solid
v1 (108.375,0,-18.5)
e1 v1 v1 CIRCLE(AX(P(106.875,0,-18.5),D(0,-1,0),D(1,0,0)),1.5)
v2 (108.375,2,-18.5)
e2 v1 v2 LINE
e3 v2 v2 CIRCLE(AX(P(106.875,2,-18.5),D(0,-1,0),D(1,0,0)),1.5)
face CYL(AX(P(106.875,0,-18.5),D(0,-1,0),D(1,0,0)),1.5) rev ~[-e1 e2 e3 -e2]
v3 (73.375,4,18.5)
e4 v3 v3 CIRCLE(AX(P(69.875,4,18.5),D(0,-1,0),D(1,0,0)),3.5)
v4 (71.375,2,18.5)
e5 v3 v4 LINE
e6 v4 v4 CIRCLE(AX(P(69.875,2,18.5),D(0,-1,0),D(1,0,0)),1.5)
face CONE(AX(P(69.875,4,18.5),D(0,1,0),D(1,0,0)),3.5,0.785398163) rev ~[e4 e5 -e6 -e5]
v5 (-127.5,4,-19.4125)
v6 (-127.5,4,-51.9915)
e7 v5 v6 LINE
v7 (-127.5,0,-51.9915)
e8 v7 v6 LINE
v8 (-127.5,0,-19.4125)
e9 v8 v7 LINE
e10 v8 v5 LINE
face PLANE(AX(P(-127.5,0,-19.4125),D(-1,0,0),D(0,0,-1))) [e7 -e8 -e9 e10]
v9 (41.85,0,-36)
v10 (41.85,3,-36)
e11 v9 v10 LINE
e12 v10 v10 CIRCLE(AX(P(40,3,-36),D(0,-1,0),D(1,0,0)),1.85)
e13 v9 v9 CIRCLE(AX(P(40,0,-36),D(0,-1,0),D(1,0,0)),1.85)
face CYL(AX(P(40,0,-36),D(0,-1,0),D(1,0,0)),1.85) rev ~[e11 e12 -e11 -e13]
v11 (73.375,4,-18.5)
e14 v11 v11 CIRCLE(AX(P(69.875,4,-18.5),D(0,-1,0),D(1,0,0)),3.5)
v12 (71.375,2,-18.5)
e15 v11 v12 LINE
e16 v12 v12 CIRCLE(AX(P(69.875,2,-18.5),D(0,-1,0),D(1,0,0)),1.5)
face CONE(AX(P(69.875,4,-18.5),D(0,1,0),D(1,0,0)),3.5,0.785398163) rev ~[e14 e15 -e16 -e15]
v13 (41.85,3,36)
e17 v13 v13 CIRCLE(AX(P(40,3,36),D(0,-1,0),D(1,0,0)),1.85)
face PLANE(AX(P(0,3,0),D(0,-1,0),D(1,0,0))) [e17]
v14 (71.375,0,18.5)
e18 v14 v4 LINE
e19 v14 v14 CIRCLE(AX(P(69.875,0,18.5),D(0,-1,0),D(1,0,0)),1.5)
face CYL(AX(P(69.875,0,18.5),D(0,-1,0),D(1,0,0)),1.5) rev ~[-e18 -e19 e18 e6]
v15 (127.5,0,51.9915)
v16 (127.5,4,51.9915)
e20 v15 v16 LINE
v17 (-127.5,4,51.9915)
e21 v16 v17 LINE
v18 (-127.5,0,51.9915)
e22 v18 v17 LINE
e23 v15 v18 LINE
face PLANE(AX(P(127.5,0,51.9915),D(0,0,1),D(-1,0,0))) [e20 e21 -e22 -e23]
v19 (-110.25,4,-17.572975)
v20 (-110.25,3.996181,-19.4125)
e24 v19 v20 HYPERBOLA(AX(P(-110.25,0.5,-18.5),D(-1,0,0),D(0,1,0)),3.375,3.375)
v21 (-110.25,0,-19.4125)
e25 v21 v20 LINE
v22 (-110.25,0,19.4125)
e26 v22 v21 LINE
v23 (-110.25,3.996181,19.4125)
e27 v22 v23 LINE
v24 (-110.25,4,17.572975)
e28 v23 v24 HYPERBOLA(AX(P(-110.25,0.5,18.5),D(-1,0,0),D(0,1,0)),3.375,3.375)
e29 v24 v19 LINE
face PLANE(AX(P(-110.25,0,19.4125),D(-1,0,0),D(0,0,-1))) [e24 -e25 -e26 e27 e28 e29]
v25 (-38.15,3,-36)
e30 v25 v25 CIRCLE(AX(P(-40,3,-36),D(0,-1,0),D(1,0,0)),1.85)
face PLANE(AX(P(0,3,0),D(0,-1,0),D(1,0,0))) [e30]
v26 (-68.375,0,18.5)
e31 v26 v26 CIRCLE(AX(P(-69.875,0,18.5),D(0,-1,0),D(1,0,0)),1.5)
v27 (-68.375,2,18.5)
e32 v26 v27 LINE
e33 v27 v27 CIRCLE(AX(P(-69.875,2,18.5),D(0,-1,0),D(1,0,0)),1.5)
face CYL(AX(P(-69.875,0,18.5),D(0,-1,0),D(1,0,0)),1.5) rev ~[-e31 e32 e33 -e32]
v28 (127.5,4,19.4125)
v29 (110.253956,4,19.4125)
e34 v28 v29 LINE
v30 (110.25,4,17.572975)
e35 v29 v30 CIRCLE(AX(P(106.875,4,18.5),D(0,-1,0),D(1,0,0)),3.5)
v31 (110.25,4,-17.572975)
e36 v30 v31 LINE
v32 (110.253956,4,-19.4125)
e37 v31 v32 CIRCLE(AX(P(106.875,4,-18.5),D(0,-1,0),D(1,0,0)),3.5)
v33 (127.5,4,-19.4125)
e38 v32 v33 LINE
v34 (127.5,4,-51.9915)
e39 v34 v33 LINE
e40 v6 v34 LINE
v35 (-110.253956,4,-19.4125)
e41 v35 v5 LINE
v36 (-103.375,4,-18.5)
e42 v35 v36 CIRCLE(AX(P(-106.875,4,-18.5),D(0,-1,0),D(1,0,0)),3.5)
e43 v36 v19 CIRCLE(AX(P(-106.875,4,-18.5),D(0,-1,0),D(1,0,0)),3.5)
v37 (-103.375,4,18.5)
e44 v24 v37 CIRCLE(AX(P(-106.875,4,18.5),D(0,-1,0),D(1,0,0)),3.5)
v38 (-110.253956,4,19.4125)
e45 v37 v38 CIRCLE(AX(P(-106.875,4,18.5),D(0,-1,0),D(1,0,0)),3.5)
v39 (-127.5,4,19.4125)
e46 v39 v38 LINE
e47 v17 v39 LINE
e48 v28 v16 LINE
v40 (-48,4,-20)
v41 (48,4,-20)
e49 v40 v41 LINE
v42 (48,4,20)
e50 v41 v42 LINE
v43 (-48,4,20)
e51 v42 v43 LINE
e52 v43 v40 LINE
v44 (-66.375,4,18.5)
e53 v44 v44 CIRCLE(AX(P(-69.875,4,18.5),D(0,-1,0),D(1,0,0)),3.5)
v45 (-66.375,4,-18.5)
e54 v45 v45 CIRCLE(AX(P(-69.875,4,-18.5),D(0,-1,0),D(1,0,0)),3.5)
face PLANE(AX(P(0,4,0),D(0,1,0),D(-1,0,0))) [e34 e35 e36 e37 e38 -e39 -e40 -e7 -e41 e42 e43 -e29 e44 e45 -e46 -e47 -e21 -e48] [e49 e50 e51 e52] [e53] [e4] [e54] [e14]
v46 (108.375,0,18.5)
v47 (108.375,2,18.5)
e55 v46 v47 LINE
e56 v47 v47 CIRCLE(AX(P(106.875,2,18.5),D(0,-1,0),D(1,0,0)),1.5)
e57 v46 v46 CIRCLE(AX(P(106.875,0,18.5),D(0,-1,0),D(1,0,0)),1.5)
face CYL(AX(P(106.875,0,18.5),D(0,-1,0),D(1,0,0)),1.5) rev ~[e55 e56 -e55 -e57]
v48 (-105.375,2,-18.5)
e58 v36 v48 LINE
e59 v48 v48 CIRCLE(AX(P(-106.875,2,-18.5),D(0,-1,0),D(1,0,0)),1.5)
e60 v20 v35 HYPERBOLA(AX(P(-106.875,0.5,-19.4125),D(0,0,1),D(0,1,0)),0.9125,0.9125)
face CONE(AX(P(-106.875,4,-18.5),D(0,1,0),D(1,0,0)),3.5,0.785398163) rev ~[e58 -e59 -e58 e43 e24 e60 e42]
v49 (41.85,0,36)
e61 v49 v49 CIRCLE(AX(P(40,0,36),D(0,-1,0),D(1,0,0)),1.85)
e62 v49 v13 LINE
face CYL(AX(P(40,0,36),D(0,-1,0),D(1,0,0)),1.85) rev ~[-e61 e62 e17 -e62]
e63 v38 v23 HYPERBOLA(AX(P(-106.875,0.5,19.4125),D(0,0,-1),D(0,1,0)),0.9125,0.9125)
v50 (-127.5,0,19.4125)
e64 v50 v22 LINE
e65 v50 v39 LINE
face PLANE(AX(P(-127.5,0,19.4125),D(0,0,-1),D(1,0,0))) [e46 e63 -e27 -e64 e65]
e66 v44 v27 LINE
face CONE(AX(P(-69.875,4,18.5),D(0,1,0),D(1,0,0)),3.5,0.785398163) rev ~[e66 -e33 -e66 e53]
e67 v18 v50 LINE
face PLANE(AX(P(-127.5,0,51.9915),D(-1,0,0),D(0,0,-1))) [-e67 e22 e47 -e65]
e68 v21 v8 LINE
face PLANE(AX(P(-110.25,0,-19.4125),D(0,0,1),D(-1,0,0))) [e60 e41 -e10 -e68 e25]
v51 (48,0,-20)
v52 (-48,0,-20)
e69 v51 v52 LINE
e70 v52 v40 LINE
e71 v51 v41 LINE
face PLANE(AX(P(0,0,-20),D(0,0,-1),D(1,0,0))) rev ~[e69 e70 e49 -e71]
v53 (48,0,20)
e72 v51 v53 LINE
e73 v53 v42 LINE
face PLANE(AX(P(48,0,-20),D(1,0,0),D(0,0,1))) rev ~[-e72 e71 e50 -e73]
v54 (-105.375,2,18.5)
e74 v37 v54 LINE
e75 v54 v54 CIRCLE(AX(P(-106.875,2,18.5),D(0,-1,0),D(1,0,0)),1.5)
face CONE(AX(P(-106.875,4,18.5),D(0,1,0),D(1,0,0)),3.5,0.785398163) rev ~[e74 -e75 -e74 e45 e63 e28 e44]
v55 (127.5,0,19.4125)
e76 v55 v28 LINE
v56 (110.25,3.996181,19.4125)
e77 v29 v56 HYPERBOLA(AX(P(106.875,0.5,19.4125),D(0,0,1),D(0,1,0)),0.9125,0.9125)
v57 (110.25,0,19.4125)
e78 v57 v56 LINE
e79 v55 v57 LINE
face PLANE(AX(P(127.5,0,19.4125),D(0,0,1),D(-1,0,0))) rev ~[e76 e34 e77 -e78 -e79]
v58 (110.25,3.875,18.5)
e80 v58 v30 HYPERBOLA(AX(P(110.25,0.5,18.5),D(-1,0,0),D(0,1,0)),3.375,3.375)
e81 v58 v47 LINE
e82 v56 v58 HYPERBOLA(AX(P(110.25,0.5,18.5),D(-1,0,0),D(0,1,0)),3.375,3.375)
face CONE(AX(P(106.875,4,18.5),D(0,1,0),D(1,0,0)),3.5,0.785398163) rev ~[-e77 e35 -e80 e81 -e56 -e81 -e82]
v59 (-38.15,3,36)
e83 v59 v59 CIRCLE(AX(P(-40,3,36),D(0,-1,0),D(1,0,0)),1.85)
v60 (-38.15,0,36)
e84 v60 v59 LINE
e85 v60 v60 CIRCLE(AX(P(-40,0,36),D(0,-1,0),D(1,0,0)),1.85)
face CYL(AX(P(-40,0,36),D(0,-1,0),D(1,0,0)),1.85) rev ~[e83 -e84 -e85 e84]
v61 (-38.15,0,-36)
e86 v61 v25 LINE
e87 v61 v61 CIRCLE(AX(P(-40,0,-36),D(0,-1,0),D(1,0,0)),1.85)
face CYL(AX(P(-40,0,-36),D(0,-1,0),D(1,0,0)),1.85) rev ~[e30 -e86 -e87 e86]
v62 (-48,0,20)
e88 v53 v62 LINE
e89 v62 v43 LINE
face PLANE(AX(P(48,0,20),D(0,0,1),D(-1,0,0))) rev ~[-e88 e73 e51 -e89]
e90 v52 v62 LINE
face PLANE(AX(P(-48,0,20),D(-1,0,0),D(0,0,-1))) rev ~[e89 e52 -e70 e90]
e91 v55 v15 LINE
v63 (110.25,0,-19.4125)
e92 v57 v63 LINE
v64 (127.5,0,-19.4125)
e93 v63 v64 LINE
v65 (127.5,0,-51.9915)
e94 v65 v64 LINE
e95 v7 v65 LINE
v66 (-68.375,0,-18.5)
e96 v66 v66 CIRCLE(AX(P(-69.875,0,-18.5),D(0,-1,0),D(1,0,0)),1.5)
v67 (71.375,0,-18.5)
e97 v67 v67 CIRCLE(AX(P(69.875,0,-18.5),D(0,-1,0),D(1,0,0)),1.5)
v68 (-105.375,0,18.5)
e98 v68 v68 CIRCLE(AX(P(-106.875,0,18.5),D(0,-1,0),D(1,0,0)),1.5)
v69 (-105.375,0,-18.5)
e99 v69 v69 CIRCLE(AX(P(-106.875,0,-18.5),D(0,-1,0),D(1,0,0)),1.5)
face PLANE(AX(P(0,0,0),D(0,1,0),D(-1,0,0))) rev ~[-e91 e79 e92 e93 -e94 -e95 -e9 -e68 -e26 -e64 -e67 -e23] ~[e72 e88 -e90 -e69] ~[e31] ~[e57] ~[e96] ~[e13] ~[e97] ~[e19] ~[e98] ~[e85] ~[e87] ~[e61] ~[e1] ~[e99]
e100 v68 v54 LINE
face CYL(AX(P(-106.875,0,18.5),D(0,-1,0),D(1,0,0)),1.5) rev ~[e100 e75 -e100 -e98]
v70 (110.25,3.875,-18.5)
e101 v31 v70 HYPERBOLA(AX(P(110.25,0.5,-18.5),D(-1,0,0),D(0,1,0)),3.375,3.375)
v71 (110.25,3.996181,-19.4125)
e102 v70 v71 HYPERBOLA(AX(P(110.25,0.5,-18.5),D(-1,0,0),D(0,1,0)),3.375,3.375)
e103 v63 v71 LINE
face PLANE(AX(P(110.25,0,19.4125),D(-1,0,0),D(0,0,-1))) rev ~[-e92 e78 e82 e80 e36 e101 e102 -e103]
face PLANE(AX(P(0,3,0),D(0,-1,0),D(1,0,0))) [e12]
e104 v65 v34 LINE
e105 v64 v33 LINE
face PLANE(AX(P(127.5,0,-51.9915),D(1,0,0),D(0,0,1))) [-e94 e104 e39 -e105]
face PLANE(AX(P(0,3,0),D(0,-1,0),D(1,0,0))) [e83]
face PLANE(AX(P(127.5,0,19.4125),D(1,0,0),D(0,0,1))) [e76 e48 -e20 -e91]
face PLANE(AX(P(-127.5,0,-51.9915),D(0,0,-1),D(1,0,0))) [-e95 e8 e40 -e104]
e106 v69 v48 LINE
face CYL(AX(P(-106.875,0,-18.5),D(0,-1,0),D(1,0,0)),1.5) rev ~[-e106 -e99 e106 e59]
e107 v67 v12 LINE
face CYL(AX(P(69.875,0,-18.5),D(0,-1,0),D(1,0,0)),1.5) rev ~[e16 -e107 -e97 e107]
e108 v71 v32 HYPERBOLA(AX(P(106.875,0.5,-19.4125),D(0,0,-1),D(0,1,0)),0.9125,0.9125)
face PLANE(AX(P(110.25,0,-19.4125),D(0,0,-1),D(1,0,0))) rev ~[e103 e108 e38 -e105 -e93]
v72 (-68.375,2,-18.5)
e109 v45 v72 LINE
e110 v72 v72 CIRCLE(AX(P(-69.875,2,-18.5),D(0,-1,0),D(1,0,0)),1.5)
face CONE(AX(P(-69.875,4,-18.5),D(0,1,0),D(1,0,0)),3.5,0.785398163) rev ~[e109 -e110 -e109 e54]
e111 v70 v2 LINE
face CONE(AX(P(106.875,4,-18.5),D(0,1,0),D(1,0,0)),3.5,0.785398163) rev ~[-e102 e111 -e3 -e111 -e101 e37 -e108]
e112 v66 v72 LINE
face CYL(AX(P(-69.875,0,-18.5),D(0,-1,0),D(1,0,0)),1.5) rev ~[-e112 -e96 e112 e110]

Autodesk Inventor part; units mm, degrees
ref_plane "YZ Plane" through (0, 0, 0) normal (1, 0, 0) x (0, 1, 0)
ref_plane "XZ Plane" through (0, 0, 0) normal (0, 1, 0) x (-1, 0, 0)
ref_plane "XY Plane" through (0, 0, 0) normal (0, 0, 1) x (1, 0, 0)
sketch "Эскиз1" plane through (0, 0, 0) normal (0, 1, 0) x (-1, 0, 0)
  line L0 (-127.5, 51.9915) -> (127.5, 51.9915)
  line L1 (127.5, 51.9915) -> (127.5, -51.9915)
  line L2 (127.5, -51.9915) -> (-127.5, -51.9915)
  line L3 (-127.5, -51.9915) -> (-127.5, 51.9915)
  line L4 (-48, 20) -> (48, 20)
  line L5 (48, 20) -> (48, -20)
  line L6 (48, -20) -> (-48, -20)
  line L7 (-48, -20) -> (-48, 20)
  line L8 (-48, 20) -> (48, -20) construction
  line L9 (48, 20) -> (-48, -20) construction
  line L10 (127.5, 19.4125) -> (110.25, 19.4125)
  line L11 (110.25, 19.4125) -> (110.25, -19.4125)
  line L12 (110.25, -19.4125) -> (127.5, -19.4125)
  line L13 (127.5, -19.4125) -> (127.5, 19.4125)
  line L14 (48, 0) -> (57.4345, 0)
  line L15 (0, 0) -> (0, -38.2708)
  line L16 (-127.5, 19.4125) -> (-110.25, 19.4125)
  line L17 (-110.25, 19.4125) -> (-110.25, -19.4125)
  line L18 (-110.25, -19.4125) -> (-127.5, -19.4125)
  line L19 (-127.5, -19.4125) -> (-127.5, 19.4125)
  dimension "d0" = 103.983
  dimension "d1" = 255
  dimension "d2" = 96
  dimension "d3" = 40
  dimension "d4" = 38.825
  dimension "d5" = 17.25
extrude "Выдавливание1" add sketch "Эскиз1" along normal blind 4 contours L0 L1 L10 L11 L12 L2 L3 L18 L17 L16
sketch "Эскиз2" plane through (0, 0, 0) normal (0, -1, 0) x (1, 0, 0)
  circle A0 centre (40, 36) radius 1.85 projected
  circle A1 centre (40, -36) radius 1.85 projected
  circle A2 centre (-40, -36) radius 1.85 projected
  circle A3 centre (-40, 36) radius 1.85 projected
  point P0 (0, 0)
extrude "Выдавливание2" cut sketch "Эскиз2" against normal blind 3
sketch "Эскиз3" plane through (0, 0, 0) normal (0, -1, 0) x (1, 0, 0)
  circle A0 centre (-106.875, 18.5) radius 1.5 projected
  circle A1 centre (-69.875, 18.5) radius 1.5 projected
  circle A2 centre (-106.875, -18.5) radius 1.5 projected
  circle A3 centre (-69.875, -18.5) radius 1.5 projected
  circle A4 centre (69.875, -18.5) radius 1.5 projected
  circle A5 centre (69.875, 18.5) radius 1.5 projected
  circle A6 centre (106.875, 18.5) radius 1.5 projected
  circle A7 centre (106.875, -18.5) radius 1.5 projected
  point P0 (0, 0)
extrude "Выдавливание3" cut sketch "Эскиз3" against normal blind 4
chamfer "Фаска1" distance 2 angle 45 8 edges at (-108.375, 4, 18.5) (-71.375, 4, 18.5) (-71.375, 4, -18.5) (-108.375, 4, -18.5) (68.375, 4, -18.5) (68.375, 4, 18.5) (105.375, 4, 18.5) (105.375, 4, -18.5)
properties part number "KB33-046-004-019 - Площадка под драйверы"
